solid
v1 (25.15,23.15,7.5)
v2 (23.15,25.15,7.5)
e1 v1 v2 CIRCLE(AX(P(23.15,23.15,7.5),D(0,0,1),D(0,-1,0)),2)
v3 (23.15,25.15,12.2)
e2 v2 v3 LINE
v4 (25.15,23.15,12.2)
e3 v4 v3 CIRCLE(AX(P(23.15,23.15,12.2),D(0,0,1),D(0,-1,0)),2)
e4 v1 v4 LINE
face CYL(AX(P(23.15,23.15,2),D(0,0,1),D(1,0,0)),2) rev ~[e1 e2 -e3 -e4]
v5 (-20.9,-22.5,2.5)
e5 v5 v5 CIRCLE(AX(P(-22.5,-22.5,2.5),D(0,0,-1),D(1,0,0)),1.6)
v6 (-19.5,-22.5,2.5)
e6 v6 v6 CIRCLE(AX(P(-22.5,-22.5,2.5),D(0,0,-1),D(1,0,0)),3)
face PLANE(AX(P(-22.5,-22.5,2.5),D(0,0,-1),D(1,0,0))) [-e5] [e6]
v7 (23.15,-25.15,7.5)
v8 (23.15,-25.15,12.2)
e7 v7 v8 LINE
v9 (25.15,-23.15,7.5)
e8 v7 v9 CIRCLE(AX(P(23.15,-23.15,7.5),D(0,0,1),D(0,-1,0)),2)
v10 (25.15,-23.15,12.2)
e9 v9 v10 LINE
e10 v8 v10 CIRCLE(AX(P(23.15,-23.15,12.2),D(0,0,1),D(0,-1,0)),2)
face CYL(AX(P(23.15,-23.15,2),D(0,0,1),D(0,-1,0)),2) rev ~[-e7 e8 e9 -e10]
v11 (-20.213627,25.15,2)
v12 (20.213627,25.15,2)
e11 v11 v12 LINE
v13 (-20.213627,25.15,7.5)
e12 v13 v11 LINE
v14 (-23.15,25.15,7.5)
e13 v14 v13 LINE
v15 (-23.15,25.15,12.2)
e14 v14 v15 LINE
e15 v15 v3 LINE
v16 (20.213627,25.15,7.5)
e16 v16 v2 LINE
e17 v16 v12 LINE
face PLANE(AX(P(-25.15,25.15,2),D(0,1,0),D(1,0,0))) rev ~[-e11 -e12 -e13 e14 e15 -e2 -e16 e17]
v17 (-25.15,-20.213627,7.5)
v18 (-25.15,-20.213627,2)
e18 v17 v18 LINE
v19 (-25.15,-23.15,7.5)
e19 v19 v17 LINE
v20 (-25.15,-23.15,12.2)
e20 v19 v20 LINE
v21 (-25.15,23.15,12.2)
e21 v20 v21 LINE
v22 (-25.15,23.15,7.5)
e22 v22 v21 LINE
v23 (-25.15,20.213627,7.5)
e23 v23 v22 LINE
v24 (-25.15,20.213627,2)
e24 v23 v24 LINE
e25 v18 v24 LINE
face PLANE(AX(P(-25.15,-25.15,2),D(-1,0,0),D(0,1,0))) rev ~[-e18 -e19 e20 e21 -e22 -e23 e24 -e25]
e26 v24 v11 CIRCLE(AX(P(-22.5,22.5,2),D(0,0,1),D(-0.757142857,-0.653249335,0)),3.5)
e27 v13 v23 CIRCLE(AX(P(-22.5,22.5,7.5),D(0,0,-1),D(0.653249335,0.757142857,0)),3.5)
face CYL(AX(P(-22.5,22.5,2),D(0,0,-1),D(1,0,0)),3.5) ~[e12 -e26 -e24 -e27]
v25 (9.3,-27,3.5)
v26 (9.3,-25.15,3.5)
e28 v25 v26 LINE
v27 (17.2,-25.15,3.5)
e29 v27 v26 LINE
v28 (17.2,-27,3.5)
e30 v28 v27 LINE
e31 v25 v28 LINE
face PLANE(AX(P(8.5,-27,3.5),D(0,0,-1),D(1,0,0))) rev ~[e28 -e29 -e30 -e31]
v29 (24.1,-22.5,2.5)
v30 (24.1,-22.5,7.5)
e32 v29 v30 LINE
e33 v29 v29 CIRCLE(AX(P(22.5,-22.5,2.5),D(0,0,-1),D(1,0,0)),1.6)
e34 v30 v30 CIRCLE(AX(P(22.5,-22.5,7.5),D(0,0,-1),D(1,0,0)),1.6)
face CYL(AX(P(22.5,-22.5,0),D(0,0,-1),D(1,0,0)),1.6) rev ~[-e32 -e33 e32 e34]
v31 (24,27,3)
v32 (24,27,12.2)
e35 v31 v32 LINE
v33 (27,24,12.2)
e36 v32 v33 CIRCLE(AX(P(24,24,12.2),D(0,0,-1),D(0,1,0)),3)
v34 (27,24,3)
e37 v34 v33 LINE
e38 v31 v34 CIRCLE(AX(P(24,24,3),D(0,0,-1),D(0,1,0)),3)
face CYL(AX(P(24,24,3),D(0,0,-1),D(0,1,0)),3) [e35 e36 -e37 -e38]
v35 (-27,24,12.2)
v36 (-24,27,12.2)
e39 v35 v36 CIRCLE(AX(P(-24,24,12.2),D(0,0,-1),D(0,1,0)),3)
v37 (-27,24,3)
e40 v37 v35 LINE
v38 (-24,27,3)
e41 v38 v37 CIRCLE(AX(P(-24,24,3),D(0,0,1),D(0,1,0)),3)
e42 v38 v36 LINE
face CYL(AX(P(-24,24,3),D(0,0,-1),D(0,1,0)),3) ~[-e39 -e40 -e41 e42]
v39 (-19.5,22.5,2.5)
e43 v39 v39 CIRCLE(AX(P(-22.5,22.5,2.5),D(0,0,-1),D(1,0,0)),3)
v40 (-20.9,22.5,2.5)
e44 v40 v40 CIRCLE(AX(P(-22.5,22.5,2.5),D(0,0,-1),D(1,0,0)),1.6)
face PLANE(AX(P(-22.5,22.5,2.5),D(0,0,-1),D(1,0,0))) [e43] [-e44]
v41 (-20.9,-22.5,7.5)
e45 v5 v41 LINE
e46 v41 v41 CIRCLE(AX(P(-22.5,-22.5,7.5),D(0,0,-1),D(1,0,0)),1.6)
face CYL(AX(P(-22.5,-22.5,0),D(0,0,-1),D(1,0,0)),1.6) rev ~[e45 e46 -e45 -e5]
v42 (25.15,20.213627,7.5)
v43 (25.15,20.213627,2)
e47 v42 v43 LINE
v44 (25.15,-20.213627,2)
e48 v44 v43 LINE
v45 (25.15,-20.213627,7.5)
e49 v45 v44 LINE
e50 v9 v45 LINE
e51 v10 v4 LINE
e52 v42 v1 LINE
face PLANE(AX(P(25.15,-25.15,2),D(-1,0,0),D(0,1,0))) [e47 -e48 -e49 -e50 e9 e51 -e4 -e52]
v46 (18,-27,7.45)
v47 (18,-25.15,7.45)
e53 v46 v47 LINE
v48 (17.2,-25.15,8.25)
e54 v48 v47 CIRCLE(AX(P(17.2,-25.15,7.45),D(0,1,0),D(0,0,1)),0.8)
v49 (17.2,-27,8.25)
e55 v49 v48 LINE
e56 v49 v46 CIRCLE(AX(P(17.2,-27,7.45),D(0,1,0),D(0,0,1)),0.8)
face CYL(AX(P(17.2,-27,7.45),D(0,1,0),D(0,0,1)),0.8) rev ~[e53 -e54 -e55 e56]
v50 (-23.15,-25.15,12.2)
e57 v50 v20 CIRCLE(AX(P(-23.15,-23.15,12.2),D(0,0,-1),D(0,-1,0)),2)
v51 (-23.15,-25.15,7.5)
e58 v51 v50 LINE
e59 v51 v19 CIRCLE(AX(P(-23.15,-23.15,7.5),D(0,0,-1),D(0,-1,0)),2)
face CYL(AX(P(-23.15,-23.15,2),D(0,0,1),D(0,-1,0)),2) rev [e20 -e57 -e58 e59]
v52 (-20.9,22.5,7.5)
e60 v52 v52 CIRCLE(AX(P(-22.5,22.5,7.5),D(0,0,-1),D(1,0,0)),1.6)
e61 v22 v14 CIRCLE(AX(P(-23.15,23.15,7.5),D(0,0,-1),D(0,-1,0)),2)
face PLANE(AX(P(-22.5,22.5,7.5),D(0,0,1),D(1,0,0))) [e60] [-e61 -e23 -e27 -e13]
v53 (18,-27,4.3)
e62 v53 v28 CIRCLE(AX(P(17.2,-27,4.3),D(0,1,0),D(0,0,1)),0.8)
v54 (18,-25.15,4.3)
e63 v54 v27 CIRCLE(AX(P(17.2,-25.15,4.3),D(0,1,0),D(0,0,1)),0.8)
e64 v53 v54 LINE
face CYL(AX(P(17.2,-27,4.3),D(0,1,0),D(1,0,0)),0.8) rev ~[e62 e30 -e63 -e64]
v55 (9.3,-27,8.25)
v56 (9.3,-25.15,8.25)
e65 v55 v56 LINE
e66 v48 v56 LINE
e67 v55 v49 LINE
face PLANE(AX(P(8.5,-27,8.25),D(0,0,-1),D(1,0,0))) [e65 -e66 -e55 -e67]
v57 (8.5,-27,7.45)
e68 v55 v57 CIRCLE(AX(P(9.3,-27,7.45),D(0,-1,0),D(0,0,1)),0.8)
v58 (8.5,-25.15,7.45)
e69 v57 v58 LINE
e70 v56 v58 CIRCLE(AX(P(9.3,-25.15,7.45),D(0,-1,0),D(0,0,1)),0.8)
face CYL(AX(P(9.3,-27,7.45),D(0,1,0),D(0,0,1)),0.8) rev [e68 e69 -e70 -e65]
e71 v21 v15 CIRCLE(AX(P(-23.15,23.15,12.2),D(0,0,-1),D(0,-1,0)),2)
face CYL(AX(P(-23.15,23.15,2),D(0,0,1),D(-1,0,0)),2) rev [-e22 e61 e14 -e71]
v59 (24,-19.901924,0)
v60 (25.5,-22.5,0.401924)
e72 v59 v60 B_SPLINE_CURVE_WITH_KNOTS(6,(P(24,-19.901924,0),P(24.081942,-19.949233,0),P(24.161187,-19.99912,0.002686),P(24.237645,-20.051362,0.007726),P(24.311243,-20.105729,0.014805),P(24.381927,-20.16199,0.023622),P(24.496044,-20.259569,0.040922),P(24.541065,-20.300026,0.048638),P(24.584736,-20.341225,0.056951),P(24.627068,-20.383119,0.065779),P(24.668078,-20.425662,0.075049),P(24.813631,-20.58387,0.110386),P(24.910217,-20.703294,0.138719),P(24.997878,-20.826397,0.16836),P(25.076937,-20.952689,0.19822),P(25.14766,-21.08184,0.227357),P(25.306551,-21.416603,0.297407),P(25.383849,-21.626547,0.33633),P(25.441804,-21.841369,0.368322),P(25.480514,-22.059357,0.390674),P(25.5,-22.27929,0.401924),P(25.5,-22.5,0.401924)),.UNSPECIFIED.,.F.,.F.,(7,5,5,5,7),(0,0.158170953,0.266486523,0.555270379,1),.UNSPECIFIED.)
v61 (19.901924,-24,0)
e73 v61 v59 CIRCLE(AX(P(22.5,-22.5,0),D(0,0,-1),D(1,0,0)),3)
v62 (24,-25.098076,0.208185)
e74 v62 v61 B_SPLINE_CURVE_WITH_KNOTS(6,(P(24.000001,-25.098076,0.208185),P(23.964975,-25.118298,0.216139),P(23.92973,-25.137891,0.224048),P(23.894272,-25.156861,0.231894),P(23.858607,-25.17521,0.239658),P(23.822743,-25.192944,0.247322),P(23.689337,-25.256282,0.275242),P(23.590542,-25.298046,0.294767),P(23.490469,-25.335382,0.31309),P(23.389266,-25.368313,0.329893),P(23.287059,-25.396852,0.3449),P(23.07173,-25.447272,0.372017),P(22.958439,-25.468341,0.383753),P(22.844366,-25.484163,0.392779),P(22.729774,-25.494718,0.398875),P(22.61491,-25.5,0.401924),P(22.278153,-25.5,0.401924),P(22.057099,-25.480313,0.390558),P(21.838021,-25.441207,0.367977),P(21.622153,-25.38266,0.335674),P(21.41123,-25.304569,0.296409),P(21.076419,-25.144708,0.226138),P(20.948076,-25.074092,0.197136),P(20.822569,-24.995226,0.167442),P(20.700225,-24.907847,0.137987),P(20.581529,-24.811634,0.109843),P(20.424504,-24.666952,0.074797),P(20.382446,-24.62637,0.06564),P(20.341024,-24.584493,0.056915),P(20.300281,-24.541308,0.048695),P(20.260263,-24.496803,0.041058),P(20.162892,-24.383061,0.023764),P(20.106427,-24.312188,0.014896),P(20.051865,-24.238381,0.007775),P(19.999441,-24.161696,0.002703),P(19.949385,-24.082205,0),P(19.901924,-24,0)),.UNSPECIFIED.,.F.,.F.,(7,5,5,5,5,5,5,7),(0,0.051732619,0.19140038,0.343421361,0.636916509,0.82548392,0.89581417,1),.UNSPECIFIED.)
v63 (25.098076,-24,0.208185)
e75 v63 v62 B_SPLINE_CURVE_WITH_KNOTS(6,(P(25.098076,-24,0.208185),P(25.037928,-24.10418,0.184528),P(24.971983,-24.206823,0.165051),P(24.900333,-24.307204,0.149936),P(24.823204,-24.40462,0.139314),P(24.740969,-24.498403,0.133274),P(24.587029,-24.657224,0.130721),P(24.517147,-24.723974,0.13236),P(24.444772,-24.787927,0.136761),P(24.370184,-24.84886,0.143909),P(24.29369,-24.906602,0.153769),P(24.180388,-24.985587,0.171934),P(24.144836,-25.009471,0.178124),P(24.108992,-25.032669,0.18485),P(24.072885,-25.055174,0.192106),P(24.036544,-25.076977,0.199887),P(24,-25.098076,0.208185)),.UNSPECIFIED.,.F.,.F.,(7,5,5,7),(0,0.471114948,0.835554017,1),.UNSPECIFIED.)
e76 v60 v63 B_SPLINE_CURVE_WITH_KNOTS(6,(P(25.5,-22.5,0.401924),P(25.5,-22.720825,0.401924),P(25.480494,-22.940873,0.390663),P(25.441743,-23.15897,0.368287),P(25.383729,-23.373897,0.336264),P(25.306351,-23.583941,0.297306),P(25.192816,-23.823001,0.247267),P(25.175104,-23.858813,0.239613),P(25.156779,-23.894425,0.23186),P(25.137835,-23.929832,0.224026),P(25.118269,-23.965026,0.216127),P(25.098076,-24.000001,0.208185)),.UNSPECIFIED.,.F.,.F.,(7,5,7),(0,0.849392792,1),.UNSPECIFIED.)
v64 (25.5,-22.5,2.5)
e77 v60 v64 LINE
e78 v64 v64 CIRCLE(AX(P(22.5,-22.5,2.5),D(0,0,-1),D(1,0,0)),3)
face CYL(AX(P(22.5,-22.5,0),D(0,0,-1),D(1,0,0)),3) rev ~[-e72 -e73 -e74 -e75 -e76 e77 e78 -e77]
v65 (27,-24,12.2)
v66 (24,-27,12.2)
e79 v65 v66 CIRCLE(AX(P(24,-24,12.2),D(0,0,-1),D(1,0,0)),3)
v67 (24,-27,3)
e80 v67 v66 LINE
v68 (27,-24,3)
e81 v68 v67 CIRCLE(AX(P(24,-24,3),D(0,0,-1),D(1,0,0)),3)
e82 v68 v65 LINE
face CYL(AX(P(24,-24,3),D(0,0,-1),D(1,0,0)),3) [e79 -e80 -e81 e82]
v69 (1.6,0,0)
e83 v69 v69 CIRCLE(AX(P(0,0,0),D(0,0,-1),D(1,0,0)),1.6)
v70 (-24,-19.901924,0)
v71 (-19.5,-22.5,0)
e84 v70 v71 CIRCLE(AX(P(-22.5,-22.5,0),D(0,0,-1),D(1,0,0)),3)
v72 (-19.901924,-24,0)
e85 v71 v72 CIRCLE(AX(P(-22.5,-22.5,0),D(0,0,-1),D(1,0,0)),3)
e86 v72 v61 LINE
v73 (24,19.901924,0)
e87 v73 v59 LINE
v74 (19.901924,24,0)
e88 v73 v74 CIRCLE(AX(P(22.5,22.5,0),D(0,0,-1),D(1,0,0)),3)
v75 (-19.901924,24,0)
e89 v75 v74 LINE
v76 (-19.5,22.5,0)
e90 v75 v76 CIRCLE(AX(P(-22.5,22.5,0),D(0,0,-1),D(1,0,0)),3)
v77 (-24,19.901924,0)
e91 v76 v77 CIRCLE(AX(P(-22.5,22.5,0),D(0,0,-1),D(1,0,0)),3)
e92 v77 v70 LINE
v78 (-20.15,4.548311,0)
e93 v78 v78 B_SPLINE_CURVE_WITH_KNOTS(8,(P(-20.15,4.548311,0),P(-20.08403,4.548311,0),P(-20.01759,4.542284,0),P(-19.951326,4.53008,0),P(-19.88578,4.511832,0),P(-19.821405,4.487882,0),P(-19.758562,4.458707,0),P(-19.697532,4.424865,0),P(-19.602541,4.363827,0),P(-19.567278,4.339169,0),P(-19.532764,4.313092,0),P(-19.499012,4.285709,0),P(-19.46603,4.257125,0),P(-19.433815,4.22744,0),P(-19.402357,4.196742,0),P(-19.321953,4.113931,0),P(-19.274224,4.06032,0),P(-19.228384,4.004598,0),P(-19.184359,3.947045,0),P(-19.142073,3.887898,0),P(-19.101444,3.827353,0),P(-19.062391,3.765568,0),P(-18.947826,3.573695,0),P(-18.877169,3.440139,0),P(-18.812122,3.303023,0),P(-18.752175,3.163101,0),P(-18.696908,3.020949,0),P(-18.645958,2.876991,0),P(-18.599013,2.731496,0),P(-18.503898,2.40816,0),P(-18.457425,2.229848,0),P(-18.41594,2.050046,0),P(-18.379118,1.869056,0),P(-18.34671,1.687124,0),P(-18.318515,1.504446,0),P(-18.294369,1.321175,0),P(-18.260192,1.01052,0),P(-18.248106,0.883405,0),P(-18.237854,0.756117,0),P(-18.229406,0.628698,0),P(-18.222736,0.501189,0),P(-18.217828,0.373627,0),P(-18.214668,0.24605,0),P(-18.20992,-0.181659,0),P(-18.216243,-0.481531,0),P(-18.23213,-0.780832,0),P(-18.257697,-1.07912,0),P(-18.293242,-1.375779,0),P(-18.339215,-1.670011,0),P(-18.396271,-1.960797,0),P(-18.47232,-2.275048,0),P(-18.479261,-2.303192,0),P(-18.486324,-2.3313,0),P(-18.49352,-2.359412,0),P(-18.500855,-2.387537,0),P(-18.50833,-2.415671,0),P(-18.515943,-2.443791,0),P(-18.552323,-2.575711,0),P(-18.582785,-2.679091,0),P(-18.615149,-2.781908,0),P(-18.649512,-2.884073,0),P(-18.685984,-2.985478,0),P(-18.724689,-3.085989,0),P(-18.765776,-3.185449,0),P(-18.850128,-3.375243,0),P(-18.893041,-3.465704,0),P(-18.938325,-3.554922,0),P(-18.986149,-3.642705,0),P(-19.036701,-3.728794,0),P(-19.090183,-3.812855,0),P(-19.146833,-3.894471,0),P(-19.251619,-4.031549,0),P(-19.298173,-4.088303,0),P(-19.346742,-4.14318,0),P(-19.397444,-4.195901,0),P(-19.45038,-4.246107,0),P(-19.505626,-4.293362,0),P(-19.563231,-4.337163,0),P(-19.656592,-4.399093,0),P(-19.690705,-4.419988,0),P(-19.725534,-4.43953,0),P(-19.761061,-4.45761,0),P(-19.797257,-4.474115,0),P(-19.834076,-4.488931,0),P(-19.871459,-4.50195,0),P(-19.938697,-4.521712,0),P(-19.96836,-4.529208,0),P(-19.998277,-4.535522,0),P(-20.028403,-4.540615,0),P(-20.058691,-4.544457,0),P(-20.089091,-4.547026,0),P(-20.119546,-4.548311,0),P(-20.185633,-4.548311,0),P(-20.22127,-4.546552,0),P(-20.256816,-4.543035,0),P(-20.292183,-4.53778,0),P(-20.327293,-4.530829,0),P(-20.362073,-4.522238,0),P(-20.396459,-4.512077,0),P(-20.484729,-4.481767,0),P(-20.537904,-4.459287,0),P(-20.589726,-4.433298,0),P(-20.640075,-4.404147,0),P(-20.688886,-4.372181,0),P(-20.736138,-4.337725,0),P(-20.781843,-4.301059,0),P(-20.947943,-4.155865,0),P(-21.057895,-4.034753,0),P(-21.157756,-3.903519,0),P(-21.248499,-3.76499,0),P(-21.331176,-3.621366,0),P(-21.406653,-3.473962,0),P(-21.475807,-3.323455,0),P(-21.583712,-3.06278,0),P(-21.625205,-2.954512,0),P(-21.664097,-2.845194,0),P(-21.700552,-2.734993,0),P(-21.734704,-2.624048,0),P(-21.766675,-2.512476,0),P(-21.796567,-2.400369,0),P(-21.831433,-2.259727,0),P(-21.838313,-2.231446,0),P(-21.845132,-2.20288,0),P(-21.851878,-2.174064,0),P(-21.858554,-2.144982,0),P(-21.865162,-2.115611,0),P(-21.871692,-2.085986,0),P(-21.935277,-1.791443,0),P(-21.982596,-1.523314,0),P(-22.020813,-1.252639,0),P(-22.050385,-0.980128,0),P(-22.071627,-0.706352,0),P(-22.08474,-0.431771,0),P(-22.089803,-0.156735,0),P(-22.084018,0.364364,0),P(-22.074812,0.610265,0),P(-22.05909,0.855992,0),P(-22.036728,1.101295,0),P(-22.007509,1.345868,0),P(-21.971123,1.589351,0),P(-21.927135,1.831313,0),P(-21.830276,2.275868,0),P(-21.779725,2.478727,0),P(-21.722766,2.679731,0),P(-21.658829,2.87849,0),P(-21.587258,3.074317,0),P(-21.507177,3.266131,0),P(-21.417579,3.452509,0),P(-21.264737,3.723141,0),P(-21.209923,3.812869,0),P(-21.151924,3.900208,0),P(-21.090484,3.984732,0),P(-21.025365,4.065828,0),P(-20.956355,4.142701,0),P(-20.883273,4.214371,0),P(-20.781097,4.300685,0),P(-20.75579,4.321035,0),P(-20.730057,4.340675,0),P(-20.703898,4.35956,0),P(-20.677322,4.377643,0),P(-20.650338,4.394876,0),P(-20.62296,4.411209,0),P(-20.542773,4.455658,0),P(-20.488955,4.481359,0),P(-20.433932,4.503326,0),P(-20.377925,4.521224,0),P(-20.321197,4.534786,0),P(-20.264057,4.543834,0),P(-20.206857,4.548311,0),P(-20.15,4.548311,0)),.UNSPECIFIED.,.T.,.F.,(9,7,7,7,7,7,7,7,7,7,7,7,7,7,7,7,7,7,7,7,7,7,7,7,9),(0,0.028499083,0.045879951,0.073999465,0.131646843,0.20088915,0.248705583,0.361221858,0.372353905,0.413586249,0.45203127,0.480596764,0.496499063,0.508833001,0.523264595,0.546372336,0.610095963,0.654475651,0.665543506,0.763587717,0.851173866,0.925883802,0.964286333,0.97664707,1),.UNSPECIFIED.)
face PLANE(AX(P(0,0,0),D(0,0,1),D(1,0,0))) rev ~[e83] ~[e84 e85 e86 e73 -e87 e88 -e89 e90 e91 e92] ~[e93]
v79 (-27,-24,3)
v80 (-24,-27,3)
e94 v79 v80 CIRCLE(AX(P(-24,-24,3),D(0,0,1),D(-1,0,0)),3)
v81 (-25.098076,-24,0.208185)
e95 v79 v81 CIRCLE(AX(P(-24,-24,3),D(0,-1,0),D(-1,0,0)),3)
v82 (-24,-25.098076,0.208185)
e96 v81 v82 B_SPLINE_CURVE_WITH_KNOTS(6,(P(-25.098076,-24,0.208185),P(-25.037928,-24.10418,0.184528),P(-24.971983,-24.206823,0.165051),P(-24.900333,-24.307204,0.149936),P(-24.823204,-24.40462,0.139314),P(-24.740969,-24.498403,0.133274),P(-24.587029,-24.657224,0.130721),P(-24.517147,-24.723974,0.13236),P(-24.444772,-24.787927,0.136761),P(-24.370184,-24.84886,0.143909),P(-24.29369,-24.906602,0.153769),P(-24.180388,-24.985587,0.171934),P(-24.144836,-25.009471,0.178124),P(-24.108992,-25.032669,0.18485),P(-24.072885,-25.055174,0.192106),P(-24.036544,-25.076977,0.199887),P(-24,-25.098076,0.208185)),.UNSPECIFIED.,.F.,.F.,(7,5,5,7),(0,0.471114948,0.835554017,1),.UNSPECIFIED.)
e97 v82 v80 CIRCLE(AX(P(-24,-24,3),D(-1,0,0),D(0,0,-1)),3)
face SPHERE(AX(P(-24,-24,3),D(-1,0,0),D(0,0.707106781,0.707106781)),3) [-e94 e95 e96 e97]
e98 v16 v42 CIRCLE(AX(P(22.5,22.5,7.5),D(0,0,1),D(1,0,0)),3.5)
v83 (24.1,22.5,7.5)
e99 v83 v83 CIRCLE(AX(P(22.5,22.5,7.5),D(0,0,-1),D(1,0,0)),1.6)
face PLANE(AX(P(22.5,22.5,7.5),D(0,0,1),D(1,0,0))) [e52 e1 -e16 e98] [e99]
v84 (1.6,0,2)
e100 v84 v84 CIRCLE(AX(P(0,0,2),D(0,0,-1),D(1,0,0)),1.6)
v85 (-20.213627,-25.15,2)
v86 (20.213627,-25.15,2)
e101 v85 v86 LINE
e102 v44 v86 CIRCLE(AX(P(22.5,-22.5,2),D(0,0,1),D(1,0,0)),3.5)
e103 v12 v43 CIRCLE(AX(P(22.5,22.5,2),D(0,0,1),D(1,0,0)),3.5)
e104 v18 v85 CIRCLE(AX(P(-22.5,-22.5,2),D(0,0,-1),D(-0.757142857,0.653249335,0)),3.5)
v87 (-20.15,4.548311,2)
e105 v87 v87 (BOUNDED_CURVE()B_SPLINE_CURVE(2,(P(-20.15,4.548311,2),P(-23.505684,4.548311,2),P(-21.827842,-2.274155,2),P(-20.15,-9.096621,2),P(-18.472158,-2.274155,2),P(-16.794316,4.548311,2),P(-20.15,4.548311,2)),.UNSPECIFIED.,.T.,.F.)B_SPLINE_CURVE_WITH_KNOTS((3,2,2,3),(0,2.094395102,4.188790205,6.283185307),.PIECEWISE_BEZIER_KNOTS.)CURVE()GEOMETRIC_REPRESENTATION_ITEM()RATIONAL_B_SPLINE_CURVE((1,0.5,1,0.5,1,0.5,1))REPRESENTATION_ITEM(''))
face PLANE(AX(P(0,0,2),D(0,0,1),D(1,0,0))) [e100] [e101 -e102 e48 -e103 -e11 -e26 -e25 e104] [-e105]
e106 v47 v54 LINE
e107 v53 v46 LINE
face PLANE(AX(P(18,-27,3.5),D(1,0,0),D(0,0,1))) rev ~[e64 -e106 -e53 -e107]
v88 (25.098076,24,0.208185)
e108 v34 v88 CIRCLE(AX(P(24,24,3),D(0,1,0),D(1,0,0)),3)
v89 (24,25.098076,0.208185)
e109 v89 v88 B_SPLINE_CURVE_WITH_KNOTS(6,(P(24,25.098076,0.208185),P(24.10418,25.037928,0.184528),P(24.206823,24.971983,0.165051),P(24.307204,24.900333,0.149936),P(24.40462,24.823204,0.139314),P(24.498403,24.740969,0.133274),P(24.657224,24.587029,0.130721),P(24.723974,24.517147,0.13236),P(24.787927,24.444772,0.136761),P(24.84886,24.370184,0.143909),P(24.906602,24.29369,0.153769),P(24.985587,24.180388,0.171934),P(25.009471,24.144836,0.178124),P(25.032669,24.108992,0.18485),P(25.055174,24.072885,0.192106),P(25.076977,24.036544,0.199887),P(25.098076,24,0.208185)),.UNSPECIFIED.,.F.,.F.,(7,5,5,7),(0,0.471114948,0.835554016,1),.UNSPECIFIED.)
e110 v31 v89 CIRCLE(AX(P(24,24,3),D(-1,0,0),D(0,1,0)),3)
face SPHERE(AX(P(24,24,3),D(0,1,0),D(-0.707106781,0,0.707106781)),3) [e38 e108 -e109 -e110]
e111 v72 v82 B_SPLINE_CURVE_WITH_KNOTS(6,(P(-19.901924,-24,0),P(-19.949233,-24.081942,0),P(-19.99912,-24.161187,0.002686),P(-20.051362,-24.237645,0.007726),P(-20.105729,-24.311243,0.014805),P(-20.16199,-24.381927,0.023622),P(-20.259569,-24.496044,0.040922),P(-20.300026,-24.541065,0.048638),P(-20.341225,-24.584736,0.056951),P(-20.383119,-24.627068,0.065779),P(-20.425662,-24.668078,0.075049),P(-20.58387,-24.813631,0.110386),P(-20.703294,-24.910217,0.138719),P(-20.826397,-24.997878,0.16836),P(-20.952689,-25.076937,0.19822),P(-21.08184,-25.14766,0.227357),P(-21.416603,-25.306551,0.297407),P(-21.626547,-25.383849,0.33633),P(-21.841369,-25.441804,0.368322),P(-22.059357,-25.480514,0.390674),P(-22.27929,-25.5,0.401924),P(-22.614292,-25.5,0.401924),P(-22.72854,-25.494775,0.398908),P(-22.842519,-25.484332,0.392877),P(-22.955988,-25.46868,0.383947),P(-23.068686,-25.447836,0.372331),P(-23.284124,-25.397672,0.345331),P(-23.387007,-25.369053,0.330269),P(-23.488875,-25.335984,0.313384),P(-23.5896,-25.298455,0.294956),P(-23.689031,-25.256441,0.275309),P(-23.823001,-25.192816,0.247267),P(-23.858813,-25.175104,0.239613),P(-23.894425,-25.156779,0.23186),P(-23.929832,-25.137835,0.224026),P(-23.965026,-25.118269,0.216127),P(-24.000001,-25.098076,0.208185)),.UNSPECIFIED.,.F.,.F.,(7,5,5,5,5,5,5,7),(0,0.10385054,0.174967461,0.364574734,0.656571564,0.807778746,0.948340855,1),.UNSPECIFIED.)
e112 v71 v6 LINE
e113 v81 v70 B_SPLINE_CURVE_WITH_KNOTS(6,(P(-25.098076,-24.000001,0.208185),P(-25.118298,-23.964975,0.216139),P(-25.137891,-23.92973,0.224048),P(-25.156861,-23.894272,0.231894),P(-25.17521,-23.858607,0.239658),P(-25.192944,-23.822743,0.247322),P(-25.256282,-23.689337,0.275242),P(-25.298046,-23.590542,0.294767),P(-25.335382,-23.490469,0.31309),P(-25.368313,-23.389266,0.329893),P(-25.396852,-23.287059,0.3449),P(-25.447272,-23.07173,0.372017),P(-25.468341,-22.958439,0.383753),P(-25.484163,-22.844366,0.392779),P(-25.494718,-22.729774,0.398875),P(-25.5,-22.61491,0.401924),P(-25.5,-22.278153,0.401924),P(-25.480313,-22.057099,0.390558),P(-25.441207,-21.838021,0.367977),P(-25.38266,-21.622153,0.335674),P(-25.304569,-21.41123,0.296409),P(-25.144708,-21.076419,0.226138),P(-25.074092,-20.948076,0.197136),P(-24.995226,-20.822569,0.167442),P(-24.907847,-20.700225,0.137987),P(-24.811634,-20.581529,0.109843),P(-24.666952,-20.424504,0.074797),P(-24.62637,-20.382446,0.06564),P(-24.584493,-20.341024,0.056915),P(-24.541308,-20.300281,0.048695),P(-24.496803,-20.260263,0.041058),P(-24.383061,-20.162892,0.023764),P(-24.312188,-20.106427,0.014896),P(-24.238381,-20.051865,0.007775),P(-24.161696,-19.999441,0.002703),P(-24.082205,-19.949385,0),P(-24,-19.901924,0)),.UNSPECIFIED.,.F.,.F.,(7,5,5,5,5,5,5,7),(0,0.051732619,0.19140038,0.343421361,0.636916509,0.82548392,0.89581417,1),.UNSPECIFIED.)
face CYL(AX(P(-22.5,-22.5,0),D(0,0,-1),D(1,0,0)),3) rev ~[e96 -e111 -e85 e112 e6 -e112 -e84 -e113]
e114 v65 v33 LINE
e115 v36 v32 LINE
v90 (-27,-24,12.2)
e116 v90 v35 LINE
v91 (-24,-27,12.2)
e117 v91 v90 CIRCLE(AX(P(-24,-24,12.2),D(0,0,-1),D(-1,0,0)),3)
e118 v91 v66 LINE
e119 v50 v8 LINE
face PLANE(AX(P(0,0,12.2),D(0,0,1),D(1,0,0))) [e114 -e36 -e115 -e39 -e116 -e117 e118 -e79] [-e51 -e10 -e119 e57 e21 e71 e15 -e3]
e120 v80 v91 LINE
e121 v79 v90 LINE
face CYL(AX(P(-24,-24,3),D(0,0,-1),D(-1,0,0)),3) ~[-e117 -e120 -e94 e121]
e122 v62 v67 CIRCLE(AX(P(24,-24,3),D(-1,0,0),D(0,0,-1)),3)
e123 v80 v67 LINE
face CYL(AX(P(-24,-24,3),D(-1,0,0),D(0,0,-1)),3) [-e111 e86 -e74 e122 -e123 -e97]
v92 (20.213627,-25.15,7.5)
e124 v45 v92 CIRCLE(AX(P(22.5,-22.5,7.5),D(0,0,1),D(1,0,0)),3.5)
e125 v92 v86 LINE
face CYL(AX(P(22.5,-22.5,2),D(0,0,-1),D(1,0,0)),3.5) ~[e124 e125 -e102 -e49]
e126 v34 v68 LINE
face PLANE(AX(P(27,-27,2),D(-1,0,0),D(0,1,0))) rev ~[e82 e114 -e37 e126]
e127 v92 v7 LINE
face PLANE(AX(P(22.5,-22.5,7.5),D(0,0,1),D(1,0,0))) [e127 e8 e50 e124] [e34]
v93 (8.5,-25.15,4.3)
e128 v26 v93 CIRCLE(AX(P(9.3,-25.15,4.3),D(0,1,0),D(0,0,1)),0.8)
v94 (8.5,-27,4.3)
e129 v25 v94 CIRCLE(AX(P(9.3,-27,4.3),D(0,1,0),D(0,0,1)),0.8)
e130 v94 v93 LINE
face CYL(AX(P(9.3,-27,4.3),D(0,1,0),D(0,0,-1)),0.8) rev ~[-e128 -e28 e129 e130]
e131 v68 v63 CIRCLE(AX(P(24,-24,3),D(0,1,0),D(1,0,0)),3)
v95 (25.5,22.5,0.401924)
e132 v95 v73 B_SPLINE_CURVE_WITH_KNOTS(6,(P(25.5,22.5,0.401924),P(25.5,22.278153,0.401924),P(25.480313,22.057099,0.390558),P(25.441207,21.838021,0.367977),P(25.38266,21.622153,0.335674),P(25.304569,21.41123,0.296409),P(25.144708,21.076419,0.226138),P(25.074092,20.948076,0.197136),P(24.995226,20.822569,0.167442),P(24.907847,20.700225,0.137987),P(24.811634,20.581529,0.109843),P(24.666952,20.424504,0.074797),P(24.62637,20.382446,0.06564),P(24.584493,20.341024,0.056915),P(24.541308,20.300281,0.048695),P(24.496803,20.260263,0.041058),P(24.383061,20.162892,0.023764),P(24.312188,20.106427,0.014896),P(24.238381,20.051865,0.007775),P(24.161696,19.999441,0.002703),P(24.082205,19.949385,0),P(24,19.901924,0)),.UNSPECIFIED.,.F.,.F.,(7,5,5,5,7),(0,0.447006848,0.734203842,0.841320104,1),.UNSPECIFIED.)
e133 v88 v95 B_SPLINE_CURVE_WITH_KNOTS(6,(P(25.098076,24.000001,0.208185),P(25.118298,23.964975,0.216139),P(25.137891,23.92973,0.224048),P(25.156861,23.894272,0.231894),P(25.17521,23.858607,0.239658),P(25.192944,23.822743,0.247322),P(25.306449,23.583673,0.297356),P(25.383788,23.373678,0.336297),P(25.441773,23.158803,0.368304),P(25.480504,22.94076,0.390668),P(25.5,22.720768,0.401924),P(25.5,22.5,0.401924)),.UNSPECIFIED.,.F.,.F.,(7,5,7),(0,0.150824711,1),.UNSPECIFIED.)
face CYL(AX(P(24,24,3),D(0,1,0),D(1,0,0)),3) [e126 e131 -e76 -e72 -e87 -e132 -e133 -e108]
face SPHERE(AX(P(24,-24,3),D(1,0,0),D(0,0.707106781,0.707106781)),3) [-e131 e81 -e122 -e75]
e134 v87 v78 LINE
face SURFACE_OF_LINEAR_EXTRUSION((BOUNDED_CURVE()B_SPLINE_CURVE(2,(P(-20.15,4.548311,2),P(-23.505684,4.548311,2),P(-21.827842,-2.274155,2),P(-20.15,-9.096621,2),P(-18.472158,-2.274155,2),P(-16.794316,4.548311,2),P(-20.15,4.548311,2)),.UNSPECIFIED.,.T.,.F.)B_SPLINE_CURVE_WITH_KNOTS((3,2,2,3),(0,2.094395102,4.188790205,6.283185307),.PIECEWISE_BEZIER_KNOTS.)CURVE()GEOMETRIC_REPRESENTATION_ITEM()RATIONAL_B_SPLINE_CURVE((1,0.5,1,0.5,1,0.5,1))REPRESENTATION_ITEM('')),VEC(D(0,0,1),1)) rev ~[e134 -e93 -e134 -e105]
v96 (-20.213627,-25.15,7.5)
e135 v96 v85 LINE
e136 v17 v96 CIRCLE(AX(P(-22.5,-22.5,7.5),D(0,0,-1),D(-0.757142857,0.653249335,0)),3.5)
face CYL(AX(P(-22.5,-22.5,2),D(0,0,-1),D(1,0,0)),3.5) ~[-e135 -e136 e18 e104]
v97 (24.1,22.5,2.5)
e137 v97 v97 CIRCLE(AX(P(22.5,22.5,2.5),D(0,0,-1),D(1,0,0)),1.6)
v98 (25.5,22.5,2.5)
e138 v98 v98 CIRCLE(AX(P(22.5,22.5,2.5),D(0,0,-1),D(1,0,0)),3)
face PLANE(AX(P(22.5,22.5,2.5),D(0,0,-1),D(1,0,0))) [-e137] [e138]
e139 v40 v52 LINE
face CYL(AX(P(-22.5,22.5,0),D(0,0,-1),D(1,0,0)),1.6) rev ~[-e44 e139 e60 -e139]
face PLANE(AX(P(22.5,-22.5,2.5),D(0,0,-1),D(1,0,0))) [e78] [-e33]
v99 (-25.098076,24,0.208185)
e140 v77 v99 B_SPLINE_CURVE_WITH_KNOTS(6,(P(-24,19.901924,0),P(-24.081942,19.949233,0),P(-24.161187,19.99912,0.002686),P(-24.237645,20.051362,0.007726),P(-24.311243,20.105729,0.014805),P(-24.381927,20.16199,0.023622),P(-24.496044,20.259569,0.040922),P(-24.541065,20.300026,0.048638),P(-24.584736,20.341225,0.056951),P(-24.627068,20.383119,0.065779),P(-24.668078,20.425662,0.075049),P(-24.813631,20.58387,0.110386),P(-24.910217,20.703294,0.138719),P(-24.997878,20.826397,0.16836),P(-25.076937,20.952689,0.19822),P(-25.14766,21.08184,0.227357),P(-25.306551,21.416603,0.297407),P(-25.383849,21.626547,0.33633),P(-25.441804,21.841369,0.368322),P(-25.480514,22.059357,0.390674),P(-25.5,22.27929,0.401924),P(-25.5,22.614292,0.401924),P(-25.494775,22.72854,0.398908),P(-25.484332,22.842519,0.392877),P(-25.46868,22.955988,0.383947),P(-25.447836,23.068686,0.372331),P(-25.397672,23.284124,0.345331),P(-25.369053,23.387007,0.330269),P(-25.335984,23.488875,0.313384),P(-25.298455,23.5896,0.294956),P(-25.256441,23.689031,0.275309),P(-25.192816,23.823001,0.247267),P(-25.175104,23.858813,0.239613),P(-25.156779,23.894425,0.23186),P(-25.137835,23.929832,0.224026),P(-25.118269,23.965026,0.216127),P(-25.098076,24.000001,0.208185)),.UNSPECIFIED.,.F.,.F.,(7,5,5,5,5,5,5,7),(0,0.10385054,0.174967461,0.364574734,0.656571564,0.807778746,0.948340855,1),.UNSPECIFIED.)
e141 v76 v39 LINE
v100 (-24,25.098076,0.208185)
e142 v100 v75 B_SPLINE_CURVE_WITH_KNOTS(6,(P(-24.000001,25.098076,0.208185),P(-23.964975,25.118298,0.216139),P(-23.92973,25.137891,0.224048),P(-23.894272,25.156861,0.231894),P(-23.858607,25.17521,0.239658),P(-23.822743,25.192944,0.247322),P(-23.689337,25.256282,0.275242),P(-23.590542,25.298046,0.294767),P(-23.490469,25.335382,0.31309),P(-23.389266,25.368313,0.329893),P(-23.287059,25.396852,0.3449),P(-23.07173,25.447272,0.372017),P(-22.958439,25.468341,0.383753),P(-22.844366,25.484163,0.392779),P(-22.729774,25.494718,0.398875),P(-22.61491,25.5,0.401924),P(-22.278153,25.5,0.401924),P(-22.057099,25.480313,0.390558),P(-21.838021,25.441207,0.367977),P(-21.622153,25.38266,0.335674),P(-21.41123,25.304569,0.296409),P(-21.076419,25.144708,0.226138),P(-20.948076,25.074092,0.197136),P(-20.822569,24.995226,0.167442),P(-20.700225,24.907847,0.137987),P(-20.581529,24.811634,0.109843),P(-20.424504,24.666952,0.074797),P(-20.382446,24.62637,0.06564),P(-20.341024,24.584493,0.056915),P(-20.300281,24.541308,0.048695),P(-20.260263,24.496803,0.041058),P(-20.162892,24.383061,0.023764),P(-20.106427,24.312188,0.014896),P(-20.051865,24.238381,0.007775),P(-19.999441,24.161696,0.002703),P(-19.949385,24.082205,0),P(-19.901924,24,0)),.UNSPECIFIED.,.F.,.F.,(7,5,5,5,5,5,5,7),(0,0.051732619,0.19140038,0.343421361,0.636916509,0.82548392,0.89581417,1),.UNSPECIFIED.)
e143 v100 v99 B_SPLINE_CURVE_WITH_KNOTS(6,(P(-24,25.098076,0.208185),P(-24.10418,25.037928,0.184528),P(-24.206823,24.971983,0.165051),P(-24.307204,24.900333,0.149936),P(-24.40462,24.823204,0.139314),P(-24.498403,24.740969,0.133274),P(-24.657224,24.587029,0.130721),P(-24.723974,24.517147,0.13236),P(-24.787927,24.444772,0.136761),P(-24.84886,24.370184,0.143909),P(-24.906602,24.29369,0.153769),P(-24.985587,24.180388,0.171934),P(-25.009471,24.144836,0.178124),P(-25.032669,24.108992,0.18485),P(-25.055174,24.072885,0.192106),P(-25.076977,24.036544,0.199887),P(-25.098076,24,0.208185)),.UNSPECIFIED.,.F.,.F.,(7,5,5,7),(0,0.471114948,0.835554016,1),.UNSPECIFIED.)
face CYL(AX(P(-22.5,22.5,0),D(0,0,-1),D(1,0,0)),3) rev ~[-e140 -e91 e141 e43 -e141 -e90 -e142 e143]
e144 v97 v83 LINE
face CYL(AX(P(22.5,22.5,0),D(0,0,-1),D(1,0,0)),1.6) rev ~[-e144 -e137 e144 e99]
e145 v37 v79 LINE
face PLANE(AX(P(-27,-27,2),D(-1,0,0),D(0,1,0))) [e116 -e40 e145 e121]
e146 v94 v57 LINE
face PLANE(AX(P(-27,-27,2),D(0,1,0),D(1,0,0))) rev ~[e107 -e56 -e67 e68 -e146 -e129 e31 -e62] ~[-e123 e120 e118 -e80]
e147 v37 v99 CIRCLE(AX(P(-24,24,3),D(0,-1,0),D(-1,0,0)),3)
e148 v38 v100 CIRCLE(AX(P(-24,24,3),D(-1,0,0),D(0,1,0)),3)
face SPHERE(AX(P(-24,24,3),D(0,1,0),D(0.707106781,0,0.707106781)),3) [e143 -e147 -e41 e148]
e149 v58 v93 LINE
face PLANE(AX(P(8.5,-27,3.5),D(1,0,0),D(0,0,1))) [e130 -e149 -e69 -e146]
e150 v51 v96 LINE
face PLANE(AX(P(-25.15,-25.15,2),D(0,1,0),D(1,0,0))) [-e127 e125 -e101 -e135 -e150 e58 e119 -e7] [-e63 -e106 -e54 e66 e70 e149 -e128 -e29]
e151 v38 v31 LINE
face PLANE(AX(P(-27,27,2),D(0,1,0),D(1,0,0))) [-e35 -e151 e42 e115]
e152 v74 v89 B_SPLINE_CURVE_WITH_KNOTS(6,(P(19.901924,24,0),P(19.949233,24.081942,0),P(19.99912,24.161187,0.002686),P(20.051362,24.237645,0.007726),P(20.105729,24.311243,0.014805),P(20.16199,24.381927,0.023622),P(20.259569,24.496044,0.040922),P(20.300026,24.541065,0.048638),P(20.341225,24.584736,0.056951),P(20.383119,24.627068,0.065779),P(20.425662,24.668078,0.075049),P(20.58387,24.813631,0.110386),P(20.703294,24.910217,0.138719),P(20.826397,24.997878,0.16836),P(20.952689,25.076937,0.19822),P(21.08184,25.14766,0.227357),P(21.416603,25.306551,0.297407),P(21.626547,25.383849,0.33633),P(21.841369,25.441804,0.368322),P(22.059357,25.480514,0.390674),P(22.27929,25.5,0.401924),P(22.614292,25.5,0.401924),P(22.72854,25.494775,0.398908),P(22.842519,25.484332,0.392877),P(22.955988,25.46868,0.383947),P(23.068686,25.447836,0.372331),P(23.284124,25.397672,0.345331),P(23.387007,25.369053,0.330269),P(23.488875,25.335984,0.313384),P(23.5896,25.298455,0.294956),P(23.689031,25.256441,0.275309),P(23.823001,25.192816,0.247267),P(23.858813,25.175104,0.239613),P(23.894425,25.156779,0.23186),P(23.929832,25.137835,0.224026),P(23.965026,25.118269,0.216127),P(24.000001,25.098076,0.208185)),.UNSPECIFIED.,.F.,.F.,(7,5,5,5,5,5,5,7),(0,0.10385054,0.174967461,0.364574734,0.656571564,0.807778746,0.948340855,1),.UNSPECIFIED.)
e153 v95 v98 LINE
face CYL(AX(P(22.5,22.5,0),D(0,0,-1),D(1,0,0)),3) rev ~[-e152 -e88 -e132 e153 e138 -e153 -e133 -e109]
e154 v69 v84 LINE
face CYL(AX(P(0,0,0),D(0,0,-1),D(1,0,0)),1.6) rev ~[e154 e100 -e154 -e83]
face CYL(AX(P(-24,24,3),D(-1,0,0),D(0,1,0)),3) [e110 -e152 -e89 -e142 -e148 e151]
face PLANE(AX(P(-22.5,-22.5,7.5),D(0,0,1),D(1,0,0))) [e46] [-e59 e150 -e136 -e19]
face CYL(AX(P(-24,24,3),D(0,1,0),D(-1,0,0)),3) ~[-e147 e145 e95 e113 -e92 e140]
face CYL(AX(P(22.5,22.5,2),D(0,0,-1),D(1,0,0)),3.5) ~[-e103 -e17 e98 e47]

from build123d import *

# Parameters (mm, degrees)
F0_W          = 54
F0_H          = 54
F1_DEPTH      = 2
F2_W          = 54
F2_H          = 54
F2_W_2        = 50.3
F2_H_2        = 50.3
F3_DEPTH      = 10.2
F4_R          = 3.5
F5_DEPTH      = 5.5
F6_R          = 1.6
F7_DEPTH      = 25
F8_W          = 9.5
F8_H          = 4.75
F9_DEPTH      = 25
F11_DEPTH     = 25
F12_T1_DEPTH  = 48
F12_T3_DEPTH  = 48
F12_T5_DEPTH  = 16.7
F12_S9_W      = 3
F12_S9_H      = 3
F12_T10_DEPTH = 3
F12_S15_W     = 3
F12_S15_H     = 3
F12_T16_DEPTH = 3
F12_S21_W     = 3
F12_S21_H     = 3
F12_T22_DEPTH = 3
F12_S27_W     = 3
F12_S27_H     = 3
F12_T28_DEPTH = 3
F13_R         = 3
F14_DEPTH     = 2.5
F15_R         = 0.8
F16_R         = 2


# Not quite as in the source:
# - a fillet or chamfer that OpenCascade refuses, or shapes differently, is made with other operations: its cross-section is extruded or revolved along the edge and cut away or added


with BuildPart() as f1:
    # F0 (on Top) → F1 (new body)
    with BuildSketch(Plane.XY):
        Rectangle(F0_W, F0_H)
    extrude(amount=F1_DEPTH)

    # F2 (on face) → F3 (join)
    with BuildSketch(Plane.XY.offset(2)):
        Rectangle(F2_W, F2_H)
        Rectangle(F2_W_2, F2_H_2, mode=Mode.SUBTRACT)
    extrude(amount=F3_DEPTH)

    # F4 (on face) → F5 (join)
    with BuildSketch(Plane.XY.offset(2)):
        with Locations((-22.5, 22.5)):
            Circle(F4_R)
        with Locations((22.5, 22.5)):
            Circle(F4_R)
        with Locations((22.5, -22.5)):
            Circle(F4_R)
        with Locations((-22.5, -22.5)):
            Circle(F4_R)
    extrude(amount=F5_DEPTH)

    # F6 (on face) → F7 (cut)
    with BuildSketch(Plane(origin=(0, 0, 0), x_dir=(1, 0, 0), z_dir=(0, 0, -1))):
        with Locations((-22.5, 22.5)):
            Circle(F6_R)
        with Locations((22.5, 22.5)):
            Circle(F6_R)
        with Locations((22.5, -22.5)):
            Circle(F6_R)
        with Locations((-22.5, -22.5)):
            Circle(F6_R)
        Circle(F6_R)
    extrude(amount=-F7_DEPTH, mode=Mode.SUBTRACT)

    # F8 (on face) → F9 (cut)
    with BuildSketch(Plane.XZ.offset(27)):
        with Locations((13.25, 5.875)):
            Rectangle(F8_W, F8_H)
    extrude(amount=-F9_DEPTH, mode=Mode.SUBTRACT)

    # F10 (on face) → F11 (cut)
    with BuildSketch(Plane.XY.offset(2)):
        with BuildLine():
            add(Edge.make_bspline(
                [(-20.15, 4.5483106502), (-23.5056844979, 4.5483106502), (-21.827842249, -2.2741553251), (-20.15, -9.0966213004), (-18.472157751, -2.2741553251), (-16.7943155021, 4.5483106502), (-20.15, 4.5483106502)],
                knots=[0, 0, 0, 2.0943951024, 2.0943951024, 4.1887902048, 4.1887902048, 6.2831853072, 6.2831853072, 6.2831853072], degree=2, weights=[1, 0.5, 1, 0.5, 1, 0.5, 1]))
        make_face()
    extrude(amount=-F11_DEPTH, mode=Mode.SUBTRACT)

    # F12: fillet of radius 3 on 8 edges, made by hand

    # F12_s2 → F12_t1 (cut)
    with BuildSketch(Plane.YZ.offset(-24)):
        with BuildLine():
            ThreePointArc((-24, 0), (-26.1213203436, 0.8786796564), (-27, 3))
            Line((-27, 3), (-27, 0))
            Line((-27, 0), (-24, 0))
        make_face()
        with BuildLine():
            ThreePointArc((27, 3), (26.1213203436, 0.8786796564), (24, 0))
            Line((24, 0), (27, 0))
            Line((27, 0), (27, 3))
        make_face()
    extrude(amount=F12_T1_DEPTH, mode=Mode.SUBTRACT)

    # F12_s4 → F12_t3 (cut)
    with BuildSketch(Plane.XZ.offset(-24)):
        with BuildLine():
            ThreePointArc((-27, 3), (-26.1213203436, 0.8786796564), (-24, 0))
            Line((-24, 0), (-27, 0))
            Line((-27, 0), (-27, 3))
        make_face()
        with BuildLine():
            ThreePointArc((27, 3), (26.1213203436, 0.8786796564), (24, 0))
            Line((24, 0), (27, 0))
            Line((27, 0), (27, 3))
        make_face()
    extrude(amount=F12_T3_DEPTH, mode=Mode.SUBTRACT)

    # F12_s6 → F12_t5 (cut)
    with BuildSketch(Plane.XY.offset(3)):
        with BuildLine():
            ThreePointArc((27, -24), (26.1213203436, -26.1213203436), (24, -27))
            Line((24, -27), (27, -27))
            Line((27, -27), (27, -24))
        make_face()
        with BuildLine():
            ThreePointArc((-27, -24), (-26.1213203436, -26.1213203436), (-24, -27))
            Line((-24, -27), (-27, -27))
            Line((-27, -27), (-27, -24))
        make_face()
        with BuildLine():
            ThreePointArc((-24, 27), (-26.1213203436, 26.1213203436), (-27, 24))
            Line((-27, 24), (-27, 27))
            Line((-27, 27), (-24, 27))
        make_face()
        with BuildLine():
            ThreePointArc((24, 27), (26.1213203436, 26.1213203436), (27, 24))
            Line((27, 24), (27, 27))
            Line((27, 27), (24, 27))
        make_face()
    extrude(amount=F12_T5_DEPTH, mode=Mode.SUBTRACT)


with BuildPart() as f12_tool8:
    # F12_s9 → F12_t10 (new body)
    with BuildSketch(Plane.YZ.offset(-24)):
        with Locations((-25.5, 1.5)):
            Rectangle(F12_S9_W, F12_S9_H)
    extrude(amount=-F12_T10_DEPTH)

    # F12_s11 → F12_t12 (revolve, cut)
    with BuildSketch(Plane(origin=(-24, -24, 3), x_dir=(0, 0.7071067812, 0.7071067812), z_dir=(0, -0.7071067812, 0.7071067812))):
        with BuildLine():
            ThreePointArc((0, -3), (3, 0), (0, 3))
            Line((0, 3), (0, -3))
        make_face()
    revolve(axis=Axis((-24, -24, 3), (-1, 0, 0)), mode=Mode.SUBTRACT)


with BuildPart() as f1_1:
    add(f1.part)

    # F12_t7: cut F12_tool8
    add(f12_tool8.part, mode=Mode.SUBTRACT)


with BuildPart() as f12_tool14:
    # F12_s15 → F12_t16 (new body)
    with BuildSketch(Plane.YZ.offset(24)):
        with Locations((-25.5, 1.5)):
            Rectangle(F12_S15_W, F12_S15_H)
    extrude(amount=F12_T16_DEPTH)

    # F12_s17 → F12_t18 (revolve, cut)
    with BuildSketch(Plane(origin=(24, -24, 3), x_dir=(0, 0.7071067812, 0.7071067812), z_dir=(0, 0.7071067812, -0.7071067812))):
        with BuildLine():
            ThreePointArc((0, -3), (3, 0), (0, 3))
            Line((0, 3), (0, -3))
        make_face()
    revolve(axis=Axis((24, -24, 3), (1, 0, 0)), mode=Mode.SUBTRACT)


with BuildPart() as f1_2:
    add(f1_1.part)

    # F12_t13: cut F12_tool14
    add(f12_tool14.part, mode=Mode.SUBTRACT)


with BuildPart() as f12_tool20:
    # F12_s21 → F12_t22 (new body)
    with BuildSketch(Plane.XZ.offset(-24)):
        with Locations((-25.5, 1.5)):
            Rectangle(F12_S21_W, F12_S21_H)
    extrude(amount=-F12_T22_DEPTH)

    # F12_s23 → F12_t24 (revolve, cut)
    with BuildSketch(Plane(origin=(-24, 24, 3), x_dir=(0.7071067812, 0, 0.7071067812), z_dir=(-0.7071067812, 0, 0.7071067812))):
        with BuildLine():
            ThreePointArc((0, -3), (3, 0), (0, 3))
            Line((0, 3), (0, -3))
        make_face()
    revolve(axis=Axis((-24, 24, 3), (0, 1, 0)), mode=Mode.SUBTRACT)


with BuildPart() as f1_3:
    add(f1_2.part)

    # F12_t19: cut F12_tool20
    add(f12_tool20.part, mode=Mode.SUBTRACT)


with BuildPart() as f12_tool26:
    # F12_s27 → F12_t28 (new body)
    with BuildSketch(Plane.XZ.offset(-24)):
        with Locations((25.5, 1.5)):
            Rectangle(F12_S27_W, F12_S27_H)
    extrude(amount=-F12_T28_DEPTH)

    # F12_s29 → F12_t30 (revolve, cut)
    with BuildSketch(Plane(origin=(24, 24, 3), x_dir=(-0.7071067812, 0, 0.7071067812), z_dir=(-0.7071067812, 0, -0.7071067812))):
        with BuildLine():
            ThreePointArc((0, -3), (3, 0), (0, 3))
            Line((0, 3), (0, -3))
        make_face()
    revolve(axis=Axis((24, 24, 3), (0, 1, 0)), mode=Mode.SUBTRACT)


with BuildPart() as f1_4:
    add(f1_3.part)

    # F12_t25: cut F12_tool26
    add(f12_tool26.part, mode=Mode.SUBTRACT)

    # F13 (on face) → F14 (cut)
    with BuildSketch(Plane(origin=(0, 0, 0), x_dir=(1, 0, 0), z_dir=(0, 0, -1))):
        with Locations((-22.5, 22.5)):
            Circle(F13_R)
        with Locations((22.5, 22.5)):
            Circle(F13_R)
        with Locations((22.5, -22.5)):
            Circle(F13_R)
        with Locations((-22.5, -22.5)):
            Circle(F13_R)
    extrude(amount=-F14_DEPTH, mode=Mode.SUBTRACT)

    # F15
    f15_edges = [f1_4.edges().sort_by_distance(p)[0] for p in [
        (8.5, -26.075, 8.25),
        (8.5, -26.075, 3.5),
        (18, -26.075, 3.5),
        (18, -26.075, 8.25),
    ]]
    fillet(f15_edges, radius=F15_R)

    # F16
    f16_edges = [f1_4.edges().sort_by_distance(p)[0] for p in [
        (-25.15, 25.15, 7.1),
        (25.15, 25.15, 7.1),
        (-25.15, -25.15, 7.1),
        (25.15, -25.15, 7.1),
    ]]
    fillet(f16_edges, radius=F16_R)


solid = f1_4.part
